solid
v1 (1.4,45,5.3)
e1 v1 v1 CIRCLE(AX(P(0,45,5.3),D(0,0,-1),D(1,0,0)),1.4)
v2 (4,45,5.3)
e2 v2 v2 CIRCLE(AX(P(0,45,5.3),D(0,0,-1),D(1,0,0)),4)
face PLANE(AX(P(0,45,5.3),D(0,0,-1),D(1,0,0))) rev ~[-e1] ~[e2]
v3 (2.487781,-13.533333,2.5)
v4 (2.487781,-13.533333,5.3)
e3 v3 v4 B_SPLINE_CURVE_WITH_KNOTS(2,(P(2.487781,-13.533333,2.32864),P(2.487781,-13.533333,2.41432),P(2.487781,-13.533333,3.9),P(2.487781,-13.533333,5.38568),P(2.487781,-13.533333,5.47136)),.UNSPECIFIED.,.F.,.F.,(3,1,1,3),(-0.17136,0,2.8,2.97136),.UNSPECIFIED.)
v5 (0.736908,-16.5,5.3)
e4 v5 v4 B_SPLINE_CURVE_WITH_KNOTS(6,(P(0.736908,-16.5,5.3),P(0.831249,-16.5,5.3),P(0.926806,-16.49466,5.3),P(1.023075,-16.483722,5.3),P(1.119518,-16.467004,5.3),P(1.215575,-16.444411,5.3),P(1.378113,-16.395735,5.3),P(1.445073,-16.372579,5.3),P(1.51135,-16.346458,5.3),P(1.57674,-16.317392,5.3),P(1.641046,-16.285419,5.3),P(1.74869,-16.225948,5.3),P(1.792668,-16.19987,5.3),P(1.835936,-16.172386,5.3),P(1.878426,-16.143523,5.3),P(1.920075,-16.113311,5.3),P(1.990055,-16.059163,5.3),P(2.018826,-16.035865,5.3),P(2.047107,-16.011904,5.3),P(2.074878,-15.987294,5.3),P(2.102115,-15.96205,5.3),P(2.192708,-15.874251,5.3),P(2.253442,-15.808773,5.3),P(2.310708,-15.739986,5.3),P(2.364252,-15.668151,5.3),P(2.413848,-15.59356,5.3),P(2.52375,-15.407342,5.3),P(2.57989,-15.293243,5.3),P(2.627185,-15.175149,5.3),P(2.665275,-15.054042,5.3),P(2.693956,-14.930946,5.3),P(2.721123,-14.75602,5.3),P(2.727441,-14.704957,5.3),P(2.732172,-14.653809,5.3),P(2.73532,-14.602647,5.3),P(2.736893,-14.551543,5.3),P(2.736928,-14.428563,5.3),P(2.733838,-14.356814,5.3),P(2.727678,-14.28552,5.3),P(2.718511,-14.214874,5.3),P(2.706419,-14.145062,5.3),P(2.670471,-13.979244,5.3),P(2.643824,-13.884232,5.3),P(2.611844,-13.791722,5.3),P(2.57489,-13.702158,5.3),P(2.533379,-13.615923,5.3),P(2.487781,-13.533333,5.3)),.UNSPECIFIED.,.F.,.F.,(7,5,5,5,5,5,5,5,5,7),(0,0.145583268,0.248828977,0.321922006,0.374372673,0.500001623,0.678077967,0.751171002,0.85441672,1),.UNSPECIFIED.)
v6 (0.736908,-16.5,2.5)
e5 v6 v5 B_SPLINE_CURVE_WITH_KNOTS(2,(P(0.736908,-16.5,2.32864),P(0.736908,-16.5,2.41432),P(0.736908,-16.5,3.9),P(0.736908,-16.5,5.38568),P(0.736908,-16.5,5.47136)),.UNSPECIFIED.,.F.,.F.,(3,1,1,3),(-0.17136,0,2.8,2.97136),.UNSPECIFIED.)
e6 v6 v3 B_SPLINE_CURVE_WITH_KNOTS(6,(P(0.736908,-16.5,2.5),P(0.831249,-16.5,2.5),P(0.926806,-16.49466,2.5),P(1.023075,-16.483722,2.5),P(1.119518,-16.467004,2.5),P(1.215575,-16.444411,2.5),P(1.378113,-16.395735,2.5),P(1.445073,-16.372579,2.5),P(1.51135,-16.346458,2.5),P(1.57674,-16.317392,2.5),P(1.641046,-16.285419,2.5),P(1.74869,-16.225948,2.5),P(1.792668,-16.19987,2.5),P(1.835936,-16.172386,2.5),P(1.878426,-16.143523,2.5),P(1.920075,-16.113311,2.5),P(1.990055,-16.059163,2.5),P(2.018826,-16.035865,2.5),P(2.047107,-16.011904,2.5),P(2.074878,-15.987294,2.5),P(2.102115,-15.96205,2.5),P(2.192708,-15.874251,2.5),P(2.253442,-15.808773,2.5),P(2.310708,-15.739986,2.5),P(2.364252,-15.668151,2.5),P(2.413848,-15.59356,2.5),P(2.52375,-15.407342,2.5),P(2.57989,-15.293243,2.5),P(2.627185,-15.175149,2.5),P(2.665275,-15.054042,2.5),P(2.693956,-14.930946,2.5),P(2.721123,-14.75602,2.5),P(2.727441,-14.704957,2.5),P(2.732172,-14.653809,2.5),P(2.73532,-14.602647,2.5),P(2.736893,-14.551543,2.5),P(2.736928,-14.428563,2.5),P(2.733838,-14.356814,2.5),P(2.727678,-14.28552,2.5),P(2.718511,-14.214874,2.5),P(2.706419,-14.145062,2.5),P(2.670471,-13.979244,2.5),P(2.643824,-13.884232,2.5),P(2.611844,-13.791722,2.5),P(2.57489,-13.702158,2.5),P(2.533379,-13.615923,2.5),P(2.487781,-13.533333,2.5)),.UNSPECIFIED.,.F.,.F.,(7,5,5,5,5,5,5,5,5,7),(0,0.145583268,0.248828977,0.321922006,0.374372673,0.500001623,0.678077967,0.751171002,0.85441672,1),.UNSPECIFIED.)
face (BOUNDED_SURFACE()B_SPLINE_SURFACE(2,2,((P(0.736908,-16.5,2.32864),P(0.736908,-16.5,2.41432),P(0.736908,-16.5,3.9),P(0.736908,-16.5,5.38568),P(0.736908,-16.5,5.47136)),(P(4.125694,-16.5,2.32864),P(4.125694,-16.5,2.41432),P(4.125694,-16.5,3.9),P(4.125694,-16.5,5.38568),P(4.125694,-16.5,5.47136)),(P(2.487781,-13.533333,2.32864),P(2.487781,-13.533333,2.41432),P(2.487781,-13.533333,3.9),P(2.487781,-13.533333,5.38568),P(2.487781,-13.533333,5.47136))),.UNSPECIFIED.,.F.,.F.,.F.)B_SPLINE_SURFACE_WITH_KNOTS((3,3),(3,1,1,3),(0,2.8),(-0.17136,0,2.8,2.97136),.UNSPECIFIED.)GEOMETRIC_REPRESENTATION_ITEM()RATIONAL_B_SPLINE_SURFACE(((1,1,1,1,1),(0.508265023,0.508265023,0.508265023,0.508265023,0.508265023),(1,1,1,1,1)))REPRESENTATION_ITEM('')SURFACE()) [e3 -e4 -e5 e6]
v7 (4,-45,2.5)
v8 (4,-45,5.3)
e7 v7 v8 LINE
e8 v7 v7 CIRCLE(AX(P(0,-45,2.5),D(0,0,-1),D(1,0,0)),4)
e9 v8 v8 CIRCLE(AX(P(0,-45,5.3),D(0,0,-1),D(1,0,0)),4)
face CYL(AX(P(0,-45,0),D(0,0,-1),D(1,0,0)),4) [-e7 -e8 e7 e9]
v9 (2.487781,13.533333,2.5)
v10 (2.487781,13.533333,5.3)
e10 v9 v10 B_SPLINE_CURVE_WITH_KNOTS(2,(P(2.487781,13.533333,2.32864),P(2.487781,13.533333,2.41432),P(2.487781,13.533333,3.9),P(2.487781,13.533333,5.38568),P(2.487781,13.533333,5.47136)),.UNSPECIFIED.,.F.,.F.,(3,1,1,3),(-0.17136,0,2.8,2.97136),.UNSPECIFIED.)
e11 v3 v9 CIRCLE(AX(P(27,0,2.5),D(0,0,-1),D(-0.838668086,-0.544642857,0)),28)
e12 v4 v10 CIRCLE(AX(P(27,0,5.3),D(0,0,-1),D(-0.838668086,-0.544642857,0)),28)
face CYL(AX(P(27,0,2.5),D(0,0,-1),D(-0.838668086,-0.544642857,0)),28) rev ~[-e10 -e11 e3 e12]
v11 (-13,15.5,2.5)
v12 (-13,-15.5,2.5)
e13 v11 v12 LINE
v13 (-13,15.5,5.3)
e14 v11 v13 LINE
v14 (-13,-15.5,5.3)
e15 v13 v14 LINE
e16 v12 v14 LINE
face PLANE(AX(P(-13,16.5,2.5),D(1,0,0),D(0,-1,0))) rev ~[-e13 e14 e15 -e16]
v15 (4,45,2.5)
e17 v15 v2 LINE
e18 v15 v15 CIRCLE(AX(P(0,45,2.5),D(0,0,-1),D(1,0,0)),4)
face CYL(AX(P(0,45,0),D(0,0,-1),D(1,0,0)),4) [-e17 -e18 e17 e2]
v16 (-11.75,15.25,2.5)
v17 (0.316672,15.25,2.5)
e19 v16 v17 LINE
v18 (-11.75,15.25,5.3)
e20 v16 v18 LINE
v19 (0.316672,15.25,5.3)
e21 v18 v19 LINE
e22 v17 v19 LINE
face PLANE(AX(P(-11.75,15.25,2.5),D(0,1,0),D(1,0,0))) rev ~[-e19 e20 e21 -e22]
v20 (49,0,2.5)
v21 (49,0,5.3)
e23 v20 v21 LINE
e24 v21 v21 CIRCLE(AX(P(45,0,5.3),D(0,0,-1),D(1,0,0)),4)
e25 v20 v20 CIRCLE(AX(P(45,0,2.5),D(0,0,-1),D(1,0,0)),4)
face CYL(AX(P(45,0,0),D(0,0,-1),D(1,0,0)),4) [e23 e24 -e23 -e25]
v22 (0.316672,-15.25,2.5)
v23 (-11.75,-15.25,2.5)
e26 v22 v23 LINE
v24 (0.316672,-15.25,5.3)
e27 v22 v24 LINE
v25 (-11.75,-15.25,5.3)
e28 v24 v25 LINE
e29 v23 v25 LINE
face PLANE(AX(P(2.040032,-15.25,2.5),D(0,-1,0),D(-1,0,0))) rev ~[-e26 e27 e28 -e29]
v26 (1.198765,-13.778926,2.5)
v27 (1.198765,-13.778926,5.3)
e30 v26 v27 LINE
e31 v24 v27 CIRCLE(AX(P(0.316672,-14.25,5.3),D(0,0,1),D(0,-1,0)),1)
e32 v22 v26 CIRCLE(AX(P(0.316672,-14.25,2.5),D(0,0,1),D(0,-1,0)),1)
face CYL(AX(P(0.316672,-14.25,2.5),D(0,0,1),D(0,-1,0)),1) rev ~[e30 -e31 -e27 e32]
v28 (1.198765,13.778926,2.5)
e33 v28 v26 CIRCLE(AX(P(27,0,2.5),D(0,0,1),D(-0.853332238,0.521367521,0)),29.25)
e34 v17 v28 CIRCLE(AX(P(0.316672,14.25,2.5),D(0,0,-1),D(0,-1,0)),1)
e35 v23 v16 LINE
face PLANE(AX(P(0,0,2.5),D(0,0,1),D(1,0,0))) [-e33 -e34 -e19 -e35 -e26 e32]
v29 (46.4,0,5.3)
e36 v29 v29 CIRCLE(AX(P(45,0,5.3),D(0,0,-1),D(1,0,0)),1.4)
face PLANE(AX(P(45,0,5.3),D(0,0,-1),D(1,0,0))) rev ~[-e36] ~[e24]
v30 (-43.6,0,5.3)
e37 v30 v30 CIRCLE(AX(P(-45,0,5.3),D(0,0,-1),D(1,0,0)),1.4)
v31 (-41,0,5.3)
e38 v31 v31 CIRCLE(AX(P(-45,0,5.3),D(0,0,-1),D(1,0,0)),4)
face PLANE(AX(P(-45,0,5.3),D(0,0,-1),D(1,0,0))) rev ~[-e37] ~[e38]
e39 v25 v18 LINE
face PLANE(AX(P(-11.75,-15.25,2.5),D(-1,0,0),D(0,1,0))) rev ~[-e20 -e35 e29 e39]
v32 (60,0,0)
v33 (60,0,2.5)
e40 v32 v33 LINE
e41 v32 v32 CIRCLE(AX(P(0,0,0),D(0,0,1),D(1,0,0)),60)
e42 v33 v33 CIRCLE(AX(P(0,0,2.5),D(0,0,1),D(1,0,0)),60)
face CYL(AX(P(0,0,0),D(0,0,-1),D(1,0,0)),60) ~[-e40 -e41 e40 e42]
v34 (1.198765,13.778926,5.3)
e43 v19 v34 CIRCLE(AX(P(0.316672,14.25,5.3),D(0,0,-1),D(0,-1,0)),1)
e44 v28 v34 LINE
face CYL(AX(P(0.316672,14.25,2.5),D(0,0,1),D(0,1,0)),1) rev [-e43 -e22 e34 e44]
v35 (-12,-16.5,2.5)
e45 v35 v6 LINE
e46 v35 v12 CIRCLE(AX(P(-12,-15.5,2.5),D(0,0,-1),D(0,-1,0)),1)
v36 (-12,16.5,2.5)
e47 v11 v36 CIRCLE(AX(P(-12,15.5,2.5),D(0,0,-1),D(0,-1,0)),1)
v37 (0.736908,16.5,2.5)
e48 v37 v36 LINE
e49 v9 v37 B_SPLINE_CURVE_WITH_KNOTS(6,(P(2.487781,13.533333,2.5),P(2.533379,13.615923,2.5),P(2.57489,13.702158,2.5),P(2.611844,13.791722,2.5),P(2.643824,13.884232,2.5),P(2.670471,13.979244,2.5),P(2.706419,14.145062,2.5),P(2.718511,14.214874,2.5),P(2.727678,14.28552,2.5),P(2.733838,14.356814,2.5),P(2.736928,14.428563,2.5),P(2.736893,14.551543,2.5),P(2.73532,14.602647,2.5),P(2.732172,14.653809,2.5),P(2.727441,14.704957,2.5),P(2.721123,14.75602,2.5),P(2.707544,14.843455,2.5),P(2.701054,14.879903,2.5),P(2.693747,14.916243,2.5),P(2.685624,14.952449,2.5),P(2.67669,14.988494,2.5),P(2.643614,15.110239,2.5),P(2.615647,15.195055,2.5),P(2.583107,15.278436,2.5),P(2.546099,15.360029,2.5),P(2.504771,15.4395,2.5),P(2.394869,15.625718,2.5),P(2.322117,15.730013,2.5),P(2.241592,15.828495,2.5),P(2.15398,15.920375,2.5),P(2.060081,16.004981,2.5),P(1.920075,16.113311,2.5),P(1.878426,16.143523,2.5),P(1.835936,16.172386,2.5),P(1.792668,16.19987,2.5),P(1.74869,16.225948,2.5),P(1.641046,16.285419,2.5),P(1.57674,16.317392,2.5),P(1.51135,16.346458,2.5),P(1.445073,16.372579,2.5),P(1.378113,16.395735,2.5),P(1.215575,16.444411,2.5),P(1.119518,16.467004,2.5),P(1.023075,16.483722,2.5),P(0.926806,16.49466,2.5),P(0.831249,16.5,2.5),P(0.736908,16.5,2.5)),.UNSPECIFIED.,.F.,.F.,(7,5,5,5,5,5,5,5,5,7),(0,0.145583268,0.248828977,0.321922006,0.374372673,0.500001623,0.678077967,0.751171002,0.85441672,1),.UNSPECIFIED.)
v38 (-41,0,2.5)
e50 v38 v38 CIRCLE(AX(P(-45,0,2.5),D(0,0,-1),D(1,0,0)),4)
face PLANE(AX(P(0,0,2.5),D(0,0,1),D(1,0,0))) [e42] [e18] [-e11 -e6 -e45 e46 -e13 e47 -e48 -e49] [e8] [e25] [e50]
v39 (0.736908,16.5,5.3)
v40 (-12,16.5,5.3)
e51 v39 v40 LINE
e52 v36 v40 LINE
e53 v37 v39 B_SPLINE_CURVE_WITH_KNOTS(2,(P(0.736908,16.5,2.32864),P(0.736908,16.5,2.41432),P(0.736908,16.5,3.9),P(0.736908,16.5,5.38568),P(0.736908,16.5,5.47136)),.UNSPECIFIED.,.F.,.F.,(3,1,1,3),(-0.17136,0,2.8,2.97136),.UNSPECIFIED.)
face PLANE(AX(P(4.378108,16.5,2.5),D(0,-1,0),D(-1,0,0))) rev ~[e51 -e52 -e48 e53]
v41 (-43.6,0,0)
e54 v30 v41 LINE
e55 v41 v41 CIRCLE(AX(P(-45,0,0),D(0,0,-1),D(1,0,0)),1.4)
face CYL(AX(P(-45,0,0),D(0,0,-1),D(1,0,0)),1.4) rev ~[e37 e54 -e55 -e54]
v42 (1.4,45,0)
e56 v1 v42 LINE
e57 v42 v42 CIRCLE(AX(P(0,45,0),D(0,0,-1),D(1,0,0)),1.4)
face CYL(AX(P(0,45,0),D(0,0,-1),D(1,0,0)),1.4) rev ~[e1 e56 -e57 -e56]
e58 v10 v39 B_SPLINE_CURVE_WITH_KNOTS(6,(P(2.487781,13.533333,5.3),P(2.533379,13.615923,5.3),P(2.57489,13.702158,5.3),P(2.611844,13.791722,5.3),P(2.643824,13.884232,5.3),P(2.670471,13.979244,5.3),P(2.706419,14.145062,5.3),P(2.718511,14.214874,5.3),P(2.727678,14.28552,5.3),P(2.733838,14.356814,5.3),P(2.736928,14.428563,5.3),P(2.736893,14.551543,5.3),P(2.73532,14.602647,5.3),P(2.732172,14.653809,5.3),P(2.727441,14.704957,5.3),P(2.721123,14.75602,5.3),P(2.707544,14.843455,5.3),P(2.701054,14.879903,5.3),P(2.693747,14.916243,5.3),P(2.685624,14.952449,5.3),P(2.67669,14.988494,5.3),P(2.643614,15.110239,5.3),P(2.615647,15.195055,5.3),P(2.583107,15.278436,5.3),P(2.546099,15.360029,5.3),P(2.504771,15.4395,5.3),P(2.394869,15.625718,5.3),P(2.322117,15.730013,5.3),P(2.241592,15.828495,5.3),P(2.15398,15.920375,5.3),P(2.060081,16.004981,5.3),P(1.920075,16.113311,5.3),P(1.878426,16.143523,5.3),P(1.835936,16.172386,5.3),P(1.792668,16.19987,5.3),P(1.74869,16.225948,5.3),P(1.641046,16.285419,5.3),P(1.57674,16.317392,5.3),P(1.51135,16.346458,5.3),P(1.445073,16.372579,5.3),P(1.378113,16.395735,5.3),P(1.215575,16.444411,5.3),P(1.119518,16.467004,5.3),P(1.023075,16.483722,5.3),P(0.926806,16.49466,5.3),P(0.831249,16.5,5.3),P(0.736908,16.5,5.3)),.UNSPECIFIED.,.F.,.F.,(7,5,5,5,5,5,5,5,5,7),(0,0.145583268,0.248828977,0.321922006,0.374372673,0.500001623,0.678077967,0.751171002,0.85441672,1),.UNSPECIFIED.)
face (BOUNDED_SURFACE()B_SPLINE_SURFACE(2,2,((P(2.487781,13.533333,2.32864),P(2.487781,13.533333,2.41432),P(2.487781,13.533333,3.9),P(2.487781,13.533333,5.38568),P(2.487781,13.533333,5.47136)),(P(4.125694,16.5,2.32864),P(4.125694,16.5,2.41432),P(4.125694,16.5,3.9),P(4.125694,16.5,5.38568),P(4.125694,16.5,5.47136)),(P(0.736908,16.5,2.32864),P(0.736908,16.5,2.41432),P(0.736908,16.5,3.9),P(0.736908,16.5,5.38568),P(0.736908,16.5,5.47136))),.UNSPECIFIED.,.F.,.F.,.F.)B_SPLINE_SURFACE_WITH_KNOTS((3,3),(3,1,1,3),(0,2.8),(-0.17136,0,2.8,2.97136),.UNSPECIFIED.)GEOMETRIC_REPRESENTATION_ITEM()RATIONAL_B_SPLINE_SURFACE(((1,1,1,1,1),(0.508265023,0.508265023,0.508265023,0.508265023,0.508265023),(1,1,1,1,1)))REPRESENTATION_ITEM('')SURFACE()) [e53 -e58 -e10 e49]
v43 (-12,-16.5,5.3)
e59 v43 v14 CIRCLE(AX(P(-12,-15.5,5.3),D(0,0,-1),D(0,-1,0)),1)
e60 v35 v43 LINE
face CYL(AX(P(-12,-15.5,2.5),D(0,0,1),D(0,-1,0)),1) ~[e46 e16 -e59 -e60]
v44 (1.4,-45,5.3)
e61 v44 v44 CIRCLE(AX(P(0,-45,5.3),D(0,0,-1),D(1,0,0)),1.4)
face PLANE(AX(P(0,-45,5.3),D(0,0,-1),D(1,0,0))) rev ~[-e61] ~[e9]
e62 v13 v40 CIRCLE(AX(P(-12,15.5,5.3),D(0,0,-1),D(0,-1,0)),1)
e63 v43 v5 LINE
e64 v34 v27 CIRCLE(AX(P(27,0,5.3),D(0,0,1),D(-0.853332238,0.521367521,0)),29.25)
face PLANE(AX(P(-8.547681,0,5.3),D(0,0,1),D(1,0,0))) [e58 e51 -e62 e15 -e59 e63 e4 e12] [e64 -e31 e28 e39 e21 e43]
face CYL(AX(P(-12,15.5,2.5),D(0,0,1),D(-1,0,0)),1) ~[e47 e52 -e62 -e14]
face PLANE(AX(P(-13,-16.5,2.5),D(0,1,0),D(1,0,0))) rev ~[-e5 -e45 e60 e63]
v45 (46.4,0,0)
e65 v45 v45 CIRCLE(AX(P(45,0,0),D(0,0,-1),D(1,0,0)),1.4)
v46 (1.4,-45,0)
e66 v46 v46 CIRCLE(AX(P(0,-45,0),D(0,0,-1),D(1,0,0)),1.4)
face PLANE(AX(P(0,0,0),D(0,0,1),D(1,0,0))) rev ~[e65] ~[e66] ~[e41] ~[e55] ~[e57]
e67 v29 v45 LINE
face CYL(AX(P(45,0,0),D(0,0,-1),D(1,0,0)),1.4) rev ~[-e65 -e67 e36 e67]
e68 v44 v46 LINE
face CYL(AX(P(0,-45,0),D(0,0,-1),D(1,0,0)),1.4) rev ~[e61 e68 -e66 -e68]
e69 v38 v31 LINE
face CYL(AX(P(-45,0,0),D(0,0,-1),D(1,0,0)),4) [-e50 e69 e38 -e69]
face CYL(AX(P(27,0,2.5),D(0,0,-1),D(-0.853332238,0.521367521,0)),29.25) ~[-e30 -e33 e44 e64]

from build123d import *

# Parameters (mm, degrees)
F0_R     = 60
F1_DEPTH = 2.5
F2_R     = 1.4
F3_DEPTH = 12.5
F2_R_2   = 4
F4_DEPTH = 5.3
F6_DEPTH = 2.8
F7_R     = 2
F8_R     = 1


with BuildPart() as f1:
    # F0 (on Top) → F1 (new body)
    with BuildSketch(Plane.XY):
        Circle(F0_R)
    extrude(amount=F1_DEPTH)

    # F2 (on face) → F3 (cut, symmetric)
    with BuildSketch(Plane(origin=(0, 0, 0), x_dir=(1, 0, 0), z_dir=(0, 0, -1))):
        with Locations((0, -45)):
            Circle(F2_R)
        with Locations((-45, 0)):
            Circle(F2_R)
        with Locations((0, 45)):
            Circle(F2_R)
        with Locations((45, 0)):
            Circle(F2_R)
    extrude(amount=F3_DEPTH, both=True, mode=Mode.SUBTRACT)

    # F2 (on face) → F4 (join)
    with BuildSketch(Plane(origin=(0, 0, 0), x_dir=(1, 0, 0), z_dir=(0, 0, -1))):
        with Locations((-45, 0)):
            Circle(F2_R_2)
        with Locations((-45, 0)):
            Circle(F2_R, mode=Mode.SUBTRACT)
        with Locations((0, -45)):
            Circle(F2_R_2)
        with Locations((0, -45)):
            Circle(F2_R, mode=Mode.SUBTRACT)
        with Locations((45, 0)):
            Circle(F2_R_2)
        with Locations((45, 0)):
            Circle(F2_R, mode=Mode.SUBTRACT)
        with Locations((0, 45)):
            Circle(F2_R_2)
        with Locations((0, 45)):
            Circle(F2_R, mode=Mode.SUBTRACT)
    extrude(amount=-F4_DEPTH)

    # F5 (on face) → F6 (join)
    with BuildSketch(Plane.XY.offset(2.5)):
        with BuildLine():
            ThreePointArc((2.0400320513, 15.25), (2.4361318862, 15.8801411608), (2.8481367178, 16.5))
            Line((2.8481367178, 16.5), (-13, 16.5))
            Line((-13, 16.5), (-13, -16.5))
            Line((-13, -16.5), (2.8481367178, -16.5))
            ThreePointArc((2.8481367178, -16.5), (2.4361318862, -15.8801411608), (2.0400320513, -15.25))
            Line((2.0400320513, -15.25), (-11.75, -15.25))
            Line((-11.75, -15.25), (-11.75, 15.25))
            Line((-11.75, 15.25), (2.0400320513, 15.25))
        make_face()
        with BuildLine():
            ThreePointArc((3.5172935972, 15.25), (3.939229747, 15.8808335844), (4.3781079483, 16.5))
            Line((4.3781079483, 16.5), (2.8481367178, 16.5))
            ThreePointArc((2.8481367178, 16.5), (2.4361318862, 15.8801411608), (2.0400320513, 15.25))
            Line((2.0400320513, 15.25), (3.5172935972, 15.25))
        make_face()
        with BuildLine():
            Line((2.8481367178, -16.5), (4.3781079483, -16.5))
            ThreePointArc((4.3781079483, -16.5), (3.939229747, -15.8808335844), (3.5172935972, -15.25))
            Line((3.5172935972, -15.25), (2.0400320513, -15.25))
            ThreePointArc((2.0400320513, -15.25), (2.4361318862, -15.8801411608), (2.8481367178, -16.5))
        make_face()
        with BuildLine():
            ThreePointArc((3.5172935972, -15.25), (-1, 0), (3.5172935972, 15.25))
            Line((3.5172935972, 15.25), (2.0400320513, 15.25))
            ThreePointArc((2.0400320513, 15.25), (-2.25, 0), (2.0400320513, -15.25))
            Line((2.0400320513, -15.25), (3.5172935972, -15.25))
        make_face()
    extrude(amount=F6_DEPTH)

    # F7
    f7_edges = [f1.edges().sort_by_distance(p)[0] for p in [
        (4.378108, 16.5, 3.9),
        (4.378108, -16.5, 3.9),
    ]]
    fillet(f7_edges, radius=F7_R)

    # F8
    f8_edges = [f1.edges().sort_by_distance(p)[0] for p in [
        (2.040032, -15.25, 3.9),
        (2.040032, 15.25, 3.9),
        (-13, -16.5, 3.9),
        (-13, 16.5, 3.9),
    ]]
    fillet(f8_edges, radius=F8_R)


solid = f1.part
